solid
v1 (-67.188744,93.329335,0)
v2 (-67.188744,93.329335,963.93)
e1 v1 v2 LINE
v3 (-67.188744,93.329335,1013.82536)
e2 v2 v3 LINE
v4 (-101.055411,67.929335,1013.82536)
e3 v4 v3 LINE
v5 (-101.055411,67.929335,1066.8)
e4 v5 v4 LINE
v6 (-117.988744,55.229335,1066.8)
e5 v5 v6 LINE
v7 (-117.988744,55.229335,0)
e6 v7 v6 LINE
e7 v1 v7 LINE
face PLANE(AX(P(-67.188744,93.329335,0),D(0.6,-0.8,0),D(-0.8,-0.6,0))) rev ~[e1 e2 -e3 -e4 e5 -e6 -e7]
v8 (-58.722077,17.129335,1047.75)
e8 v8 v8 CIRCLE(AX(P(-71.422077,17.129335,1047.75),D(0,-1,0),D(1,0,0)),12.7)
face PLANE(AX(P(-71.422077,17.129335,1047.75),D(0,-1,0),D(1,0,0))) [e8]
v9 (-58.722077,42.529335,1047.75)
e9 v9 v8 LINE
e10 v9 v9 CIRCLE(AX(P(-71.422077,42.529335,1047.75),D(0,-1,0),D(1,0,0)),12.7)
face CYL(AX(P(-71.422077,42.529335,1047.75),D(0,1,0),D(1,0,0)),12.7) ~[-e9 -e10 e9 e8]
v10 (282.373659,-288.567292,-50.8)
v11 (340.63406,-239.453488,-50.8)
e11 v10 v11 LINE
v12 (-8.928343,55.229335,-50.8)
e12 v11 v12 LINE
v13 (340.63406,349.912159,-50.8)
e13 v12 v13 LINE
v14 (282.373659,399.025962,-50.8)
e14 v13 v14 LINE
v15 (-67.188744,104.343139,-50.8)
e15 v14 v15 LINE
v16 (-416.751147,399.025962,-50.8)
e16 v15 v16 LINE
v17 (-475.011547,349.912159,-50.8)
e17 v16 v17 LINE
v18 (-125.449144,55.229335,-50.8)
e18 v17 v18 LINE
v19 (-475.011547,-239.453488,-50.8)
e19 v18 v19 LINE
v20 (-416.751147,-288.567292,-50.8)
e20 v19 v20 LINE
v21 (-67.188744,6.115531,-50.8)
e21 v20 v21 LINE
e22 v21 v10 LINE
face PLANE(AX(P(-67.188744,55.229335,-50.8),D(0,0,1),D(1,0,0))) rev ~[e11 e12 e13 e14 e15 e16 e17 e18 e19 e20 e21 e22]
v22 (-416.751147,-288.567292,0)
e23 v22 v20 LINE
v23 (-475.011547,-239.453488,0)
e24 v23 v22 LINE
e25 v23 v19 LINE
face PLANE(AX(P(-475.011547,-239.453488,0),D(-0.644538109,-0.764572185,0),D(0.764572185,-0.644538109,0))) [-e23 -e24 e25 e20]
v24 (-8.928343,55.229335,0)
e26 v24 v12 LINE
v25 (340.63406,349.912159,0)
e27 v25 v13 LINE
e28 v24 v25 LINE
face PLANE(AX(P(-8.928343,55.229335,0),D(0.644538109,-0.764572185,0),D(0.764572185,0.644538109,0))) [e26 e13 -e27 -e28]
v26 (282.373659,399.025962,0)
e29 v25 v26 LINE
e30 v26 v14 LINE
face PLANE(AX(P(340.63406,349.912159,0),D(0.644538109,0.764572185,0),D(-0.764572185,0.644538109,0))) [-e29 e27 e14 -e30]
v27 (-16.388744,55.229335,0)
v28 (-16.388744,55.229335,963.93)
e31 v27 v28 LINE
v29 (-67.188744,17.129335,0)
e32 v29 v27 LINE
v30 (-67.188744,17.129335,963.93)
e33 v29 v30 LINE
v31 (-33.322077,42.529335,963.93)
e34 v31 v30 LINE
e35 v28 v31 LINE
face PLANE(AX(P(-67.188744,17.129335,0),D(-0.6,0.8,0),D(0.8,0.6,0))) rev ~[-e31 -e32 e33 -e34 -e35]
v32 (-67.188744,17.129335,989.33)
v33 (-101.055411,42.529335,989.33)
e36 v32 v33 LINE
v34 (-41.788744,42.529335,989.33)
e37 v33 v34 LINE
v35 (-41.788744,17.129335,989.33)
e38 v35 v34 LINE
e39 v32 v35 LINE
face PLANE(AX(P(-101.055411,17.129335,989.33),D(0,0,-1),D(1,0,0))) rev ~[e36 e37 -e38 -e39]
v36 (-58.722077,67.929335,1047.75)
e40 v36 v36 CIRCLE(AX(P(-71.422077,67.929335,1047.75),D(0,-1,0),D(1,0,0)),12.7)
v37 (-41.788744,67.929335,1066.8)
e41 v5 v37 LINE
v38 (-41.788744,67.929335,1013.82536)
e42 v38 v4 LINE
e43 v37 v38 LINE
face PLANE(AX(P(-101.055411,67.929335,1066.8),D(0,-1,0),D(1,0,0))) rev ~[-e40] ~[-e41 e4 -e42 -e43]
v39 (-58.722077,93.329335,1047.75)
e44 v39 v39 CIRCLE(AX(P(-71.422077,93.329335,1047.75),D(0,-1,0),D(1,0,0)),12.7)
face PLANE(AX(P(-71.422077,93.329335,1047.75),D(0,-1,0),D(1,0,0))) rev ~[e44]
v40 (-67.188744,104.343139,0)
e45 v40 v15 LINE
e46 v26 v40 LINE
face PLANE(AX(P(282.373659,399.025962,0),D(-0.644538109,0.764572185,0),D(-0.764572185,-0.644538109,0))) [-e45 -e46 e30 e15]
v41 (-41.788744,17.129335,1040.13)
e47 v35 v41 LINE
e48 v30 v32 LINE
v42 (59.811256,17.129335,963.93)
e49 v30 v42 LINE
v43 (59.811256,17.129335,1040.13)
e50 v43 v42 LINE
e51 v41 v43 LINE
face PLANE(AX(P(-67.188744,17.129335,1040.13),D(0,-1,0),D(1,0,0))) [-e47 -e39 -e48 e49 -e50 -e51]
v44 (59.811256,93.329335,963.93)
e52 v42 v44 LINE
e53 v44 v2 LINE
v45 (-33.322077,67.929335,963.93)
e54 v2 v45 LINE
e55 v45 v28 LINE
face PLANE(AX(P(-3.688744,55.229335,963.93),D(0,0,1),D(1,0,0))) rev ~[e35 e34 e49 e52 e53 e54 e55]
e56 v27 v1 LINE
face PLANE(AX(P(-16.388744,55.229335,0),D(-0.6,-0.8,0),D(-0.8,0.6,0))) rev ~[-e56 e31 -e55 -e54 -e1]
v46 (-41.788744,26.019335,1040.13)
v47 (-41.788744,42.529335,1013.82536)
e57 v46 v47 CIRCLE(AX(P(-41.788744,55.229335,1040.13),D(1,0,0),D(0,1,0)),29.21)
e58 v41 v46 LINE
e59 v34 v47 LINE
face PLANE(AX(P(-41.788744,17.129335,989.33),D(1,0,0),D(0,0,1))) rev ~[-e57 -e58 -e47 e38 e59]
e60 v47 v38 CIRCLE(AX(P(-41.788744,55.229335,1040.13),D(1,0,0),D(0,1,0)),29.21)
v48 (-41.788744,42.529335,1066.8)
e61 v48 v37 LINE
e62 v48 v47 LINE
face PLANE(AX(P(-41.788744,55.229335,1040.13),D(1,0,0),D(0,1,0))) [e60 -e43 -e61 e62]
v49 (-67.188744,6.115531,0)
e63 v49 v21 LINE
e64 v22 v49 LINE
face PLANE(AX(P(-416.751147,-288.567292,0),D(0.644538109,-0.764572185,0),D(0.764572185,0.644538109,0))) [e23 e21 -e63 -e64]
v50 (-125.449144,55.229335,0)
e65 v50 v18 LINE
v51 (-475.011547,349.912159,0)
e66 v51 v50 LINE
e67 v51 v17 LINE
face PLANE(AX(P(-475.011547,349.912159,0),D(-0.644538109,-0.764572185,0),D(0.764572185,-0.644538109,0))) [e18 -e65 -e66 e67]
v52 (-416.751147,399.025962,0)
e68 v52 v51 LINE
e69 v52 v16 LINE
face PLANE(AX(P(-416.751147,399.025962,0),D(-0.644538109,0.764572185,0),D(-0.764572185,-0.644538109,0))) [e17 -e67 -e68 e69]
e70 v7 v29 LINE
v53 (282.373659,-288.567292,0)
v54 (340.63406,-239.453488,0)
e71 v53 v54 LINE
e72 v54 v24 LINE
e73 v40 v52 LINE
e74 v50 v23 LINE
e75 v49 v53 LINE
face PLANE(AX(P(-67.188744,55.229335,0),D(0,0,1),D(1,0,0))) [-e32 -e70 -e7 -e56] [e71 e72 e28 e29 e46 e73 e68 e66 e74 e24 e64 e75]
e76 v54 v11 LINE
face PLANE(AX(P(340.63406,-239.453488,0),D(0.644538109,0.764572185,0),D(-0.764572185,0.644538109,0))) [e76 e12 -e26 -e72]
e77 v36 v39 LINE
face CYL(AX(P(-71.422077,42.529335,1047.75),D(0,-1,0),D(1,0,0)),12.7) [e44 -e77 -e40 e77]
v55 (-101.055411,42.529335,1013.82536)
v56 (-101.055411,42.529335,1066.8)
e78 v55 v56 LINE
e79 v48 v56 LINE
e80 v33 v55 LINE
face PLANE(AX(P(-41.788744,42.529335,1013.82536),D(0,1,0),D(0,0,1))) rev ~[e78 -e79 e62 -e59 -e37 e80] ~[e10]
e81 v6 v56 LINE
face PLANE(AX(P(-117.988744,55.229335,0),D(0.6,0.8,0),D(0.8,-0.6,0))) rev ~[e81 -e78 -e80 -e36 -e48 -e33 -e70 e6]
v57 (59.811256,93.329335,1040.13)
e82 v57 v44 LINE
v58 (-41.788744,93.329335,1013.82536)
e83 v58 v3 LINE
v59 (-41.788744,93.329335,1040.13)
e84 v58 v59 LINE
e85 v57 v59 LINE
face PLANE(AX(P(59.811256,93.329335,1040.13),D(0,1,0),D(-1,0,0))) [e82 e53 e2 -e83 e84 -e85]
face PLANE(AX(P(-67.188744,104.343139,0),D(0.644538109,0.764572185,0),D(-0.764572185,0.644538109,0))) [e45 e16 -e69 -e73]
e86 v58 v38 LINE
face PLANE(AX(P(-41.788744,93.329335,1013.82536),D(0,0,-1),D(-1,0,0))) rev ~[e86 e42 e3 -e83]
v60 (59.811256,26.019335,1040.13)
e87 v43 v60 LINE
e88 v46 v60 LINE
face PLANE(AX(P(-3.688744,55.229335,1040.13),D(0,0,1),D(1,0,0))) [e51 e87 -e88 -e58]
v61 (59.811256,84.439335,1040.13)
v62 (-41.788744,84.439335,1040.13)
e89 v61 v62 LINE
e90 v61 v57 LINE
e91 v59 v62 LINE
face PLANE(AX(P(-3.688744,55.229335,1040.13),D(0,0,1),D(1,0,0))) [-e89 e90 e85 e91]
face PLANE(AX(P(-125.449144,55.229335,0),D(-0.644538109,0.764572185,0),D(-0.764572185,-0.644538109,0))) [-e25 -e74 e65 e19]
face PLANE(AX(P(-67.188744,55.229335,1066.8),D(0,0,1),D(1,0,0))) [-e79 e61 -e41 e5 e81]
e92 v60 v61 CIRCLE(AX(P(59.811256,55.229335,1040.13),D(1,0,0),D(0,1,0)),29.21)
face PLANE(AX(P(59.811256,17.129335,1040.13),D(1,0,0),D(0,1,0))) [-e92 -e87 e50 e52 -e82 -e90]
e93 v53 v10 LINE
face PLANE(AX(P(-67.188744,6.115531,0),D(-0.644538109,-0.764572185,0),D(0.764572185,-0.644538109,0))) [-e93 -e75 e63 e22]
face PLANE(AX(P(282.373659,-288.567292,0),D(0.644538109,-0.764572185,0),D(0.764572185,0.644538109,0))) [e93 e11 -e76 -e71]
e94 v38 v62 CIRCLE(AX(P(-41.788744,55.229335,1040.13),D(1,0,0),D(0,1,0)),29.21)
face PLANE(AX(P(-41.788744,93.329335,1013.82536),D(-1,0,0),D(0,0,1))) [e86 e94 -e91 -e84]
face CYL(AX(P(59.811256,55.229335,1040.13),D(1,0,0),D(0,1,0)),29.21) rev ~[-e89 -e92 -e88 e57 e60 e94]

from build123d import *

# Parameters (mm, degrees)
F1_DEPTH       = 50.8
F3_DEPTH       = 1066.8
F5_DEPTH       = 26.67
F7_DEPTH       = 76.2
F8_R           = 29.21
F9_DEPTH       = 101.6
F11_DEPTH      = 0.366359725
F13_DEPTH      = 59.2676666667
F14_W          = 33.8666666667
F14_H          = 50.8
F14_W_2        = 25.4
F15_DEPTH      = 25.4
F16_W          = 33.8666666667
F16_H          = 26.3046402751
F16_W_2        = 25.4
F17_DEPTH      = 25.4
F18_R          = 12.7
F19_DEPTH      = 25.4
F19_DEPTH_BACK = 50.8


# Not quite as in the source:
# - a feature names something its author has since deleted; it is built from what else it names


with BuildPart() as f1:
    # F0 (on Top) → F1 (new body)
    with BuildSketch(Plane.XY):
        Polygon((-67.1887439802, 6.1155312845), (282.3736590158, -288.5672921234), (340.6340595151, -239.4534882221), (-8.9283434809, 55.2293351858), (340.6340595151, 349.9121585937), (282.3736590158, 399.025962495), (-67.1887439802, 104.3431390871), (-416.7511469763, 399.025962495), (-475.0115474756, 349.9121585937), (-125.4491444796, 55.2293351858), (-475.0115474756, -239.4534882221), (-416.7511469763, -288.5672921234), align=None)
    extrude(amount=-F1_DEPTH)

    # F2 (on face) → F3 (join)
    with BuildSketch(Plane.XY):
        Polygon((-67.1887439802, 93.3293351858), (-117.9887439802, 55.2293351858), (-67.1887439802, 17.1293351858), (-16.3887439802, 55.2293351858), align=None)
    extrude(amount=F3_DEPTH)

    # F4 (on face) → F5 (cut)
    with BuildSketch(Plane.XY.offset(1066.8)):
        Polygon((-67.1887439802, 17.1293351858), (-33.3220773136, 42.5293351858), (-101.0554106469, 42.5293351858), align=None)
        Polygon((-101.0554106469, 67.9293351858), (-33.3220773136, 67.9293351858), (-67.1887439802, 93.3293351858), align=None)
    extrude(amount=-F5_DEPTH, mode=Mode.SUBTRACT)

    # F6 (on face) → F7 (join)
    with BuildSketch(Plane.XY.offset(1040.13)):
        Polygon((59.8112560198, 93.3293351858), (-67.1887439802, 93.3293351858), (-33.3220773136, 67.9293351858), (-16.3887439802, 55.2293351858), (-33.3220773136, 42.5293351858), (-67.1887439802, 17.1293351858), (59.8112560198, 17.1293351858), align=None)
    extrude(amount=-F7_DEPTH)

    # F8 (on face) → F9 (cut)
    with BuildSketch(Plane.YZ.offset(59.8112560198)):
        with Locations((55.2293351858, 1040.13)):
            Circle(F8_R)
    extrude(amount=-F9_DEPTH, mode=Mode.SUBTRACT)

    # F10 (on face) → F11 (cut, through all)
    with BuildSketch(Plane.XY.offset(1066.8)):
        Polygon((-33.3220773136, 67.9293351858), (-41.7887439802, 67.9293351858), (-41.7887439802, 67.1429912157), (-32.2736186868, 67.1429912157), align=None)
        Polygon((-32.2736186868, 43.3156791558), (-41.7887439802, 43.3156791558), (-41.7887439802, 42.5293351858), (-33.3220773136, 42.5293351858), align=None)
    extrude(amount=-F11_DEPTH, mode=Mode.SUBTRACT)

    # F12 (on face) → F13 (cut, through all)
    with BuildSketch(Plane.YZ.offset(-41.7887439802)):
        with BuildLine():
            Line((42.5293351858, 1040.13), (26.0193351858, 1040.13))
            ThreePointArc((26.0193351858, 1040.13), (30.4887703175, 1024.601685539), (42.5293351858, 1013.8253597249))
            Line((42.5293351858, 1013.8253597249), (42.5293351858, 1040.13))
        make_face()
        with BuildLine():
            Line((84.4393351858, 1040.13), (67.9293351858, 1040.13))
            Line((67.9293351858, 1040.13), (67.9293351858, 1013.8253597249))
            ThreePointArc((67.9293351858, 1013.8253597249), (79.969900054, 1024.601685539), (84.4393351858, 1040.13))
        make_face()
    extrude(amount=-F13_DEPTH, mode=Mode.SUBTRACT)

    # F14 (on face) → F15 (cut)
    with BuildSketch(Plane.XZ.offset(-17.1293351858)):
        with Locations((-84.1220773136, 1014.73)):
            Rectangle(F14_W, F14_H)
        with Locations((-54.4887439802, 1014.73)):
            Rectangle(F14_W_2, F14_H)
    extrude(amount=-F15_DEPTH, mode=Mode.SUBTRACT)

    # F16 (on face) → F17 (cut)
    with BuildSketch(Plane(origin=(0, 93.3293351858, 0), x_dir=(-1, 0, 0), z_dir=(0, 1, 0))):
        with Locations((84.1220773136, 1026.9776798625)):
            Rectangle(F16_W, F16_H)
        with Locations((54.4887439802, 1026.9776798625)):
            Rectangle(F16_W_2, F16_H)
    extrude(amount=-F17_DEPTH, mode=Mode.SUBTRACT)

    # F18 (on face) → F19 (join, two sides)
    with BuildSketch(Plane.XZ.offset(-42.5293351858)) as f19_sk:
        with Locations((-71.4220773136, 1047.75)):
            Circle(F18_R)
    extrude(amount=F19_DEPTH)
    extrude(f19_sk.sketch, amount=-F19_DEPTH_BACK)


solid = f1.part
